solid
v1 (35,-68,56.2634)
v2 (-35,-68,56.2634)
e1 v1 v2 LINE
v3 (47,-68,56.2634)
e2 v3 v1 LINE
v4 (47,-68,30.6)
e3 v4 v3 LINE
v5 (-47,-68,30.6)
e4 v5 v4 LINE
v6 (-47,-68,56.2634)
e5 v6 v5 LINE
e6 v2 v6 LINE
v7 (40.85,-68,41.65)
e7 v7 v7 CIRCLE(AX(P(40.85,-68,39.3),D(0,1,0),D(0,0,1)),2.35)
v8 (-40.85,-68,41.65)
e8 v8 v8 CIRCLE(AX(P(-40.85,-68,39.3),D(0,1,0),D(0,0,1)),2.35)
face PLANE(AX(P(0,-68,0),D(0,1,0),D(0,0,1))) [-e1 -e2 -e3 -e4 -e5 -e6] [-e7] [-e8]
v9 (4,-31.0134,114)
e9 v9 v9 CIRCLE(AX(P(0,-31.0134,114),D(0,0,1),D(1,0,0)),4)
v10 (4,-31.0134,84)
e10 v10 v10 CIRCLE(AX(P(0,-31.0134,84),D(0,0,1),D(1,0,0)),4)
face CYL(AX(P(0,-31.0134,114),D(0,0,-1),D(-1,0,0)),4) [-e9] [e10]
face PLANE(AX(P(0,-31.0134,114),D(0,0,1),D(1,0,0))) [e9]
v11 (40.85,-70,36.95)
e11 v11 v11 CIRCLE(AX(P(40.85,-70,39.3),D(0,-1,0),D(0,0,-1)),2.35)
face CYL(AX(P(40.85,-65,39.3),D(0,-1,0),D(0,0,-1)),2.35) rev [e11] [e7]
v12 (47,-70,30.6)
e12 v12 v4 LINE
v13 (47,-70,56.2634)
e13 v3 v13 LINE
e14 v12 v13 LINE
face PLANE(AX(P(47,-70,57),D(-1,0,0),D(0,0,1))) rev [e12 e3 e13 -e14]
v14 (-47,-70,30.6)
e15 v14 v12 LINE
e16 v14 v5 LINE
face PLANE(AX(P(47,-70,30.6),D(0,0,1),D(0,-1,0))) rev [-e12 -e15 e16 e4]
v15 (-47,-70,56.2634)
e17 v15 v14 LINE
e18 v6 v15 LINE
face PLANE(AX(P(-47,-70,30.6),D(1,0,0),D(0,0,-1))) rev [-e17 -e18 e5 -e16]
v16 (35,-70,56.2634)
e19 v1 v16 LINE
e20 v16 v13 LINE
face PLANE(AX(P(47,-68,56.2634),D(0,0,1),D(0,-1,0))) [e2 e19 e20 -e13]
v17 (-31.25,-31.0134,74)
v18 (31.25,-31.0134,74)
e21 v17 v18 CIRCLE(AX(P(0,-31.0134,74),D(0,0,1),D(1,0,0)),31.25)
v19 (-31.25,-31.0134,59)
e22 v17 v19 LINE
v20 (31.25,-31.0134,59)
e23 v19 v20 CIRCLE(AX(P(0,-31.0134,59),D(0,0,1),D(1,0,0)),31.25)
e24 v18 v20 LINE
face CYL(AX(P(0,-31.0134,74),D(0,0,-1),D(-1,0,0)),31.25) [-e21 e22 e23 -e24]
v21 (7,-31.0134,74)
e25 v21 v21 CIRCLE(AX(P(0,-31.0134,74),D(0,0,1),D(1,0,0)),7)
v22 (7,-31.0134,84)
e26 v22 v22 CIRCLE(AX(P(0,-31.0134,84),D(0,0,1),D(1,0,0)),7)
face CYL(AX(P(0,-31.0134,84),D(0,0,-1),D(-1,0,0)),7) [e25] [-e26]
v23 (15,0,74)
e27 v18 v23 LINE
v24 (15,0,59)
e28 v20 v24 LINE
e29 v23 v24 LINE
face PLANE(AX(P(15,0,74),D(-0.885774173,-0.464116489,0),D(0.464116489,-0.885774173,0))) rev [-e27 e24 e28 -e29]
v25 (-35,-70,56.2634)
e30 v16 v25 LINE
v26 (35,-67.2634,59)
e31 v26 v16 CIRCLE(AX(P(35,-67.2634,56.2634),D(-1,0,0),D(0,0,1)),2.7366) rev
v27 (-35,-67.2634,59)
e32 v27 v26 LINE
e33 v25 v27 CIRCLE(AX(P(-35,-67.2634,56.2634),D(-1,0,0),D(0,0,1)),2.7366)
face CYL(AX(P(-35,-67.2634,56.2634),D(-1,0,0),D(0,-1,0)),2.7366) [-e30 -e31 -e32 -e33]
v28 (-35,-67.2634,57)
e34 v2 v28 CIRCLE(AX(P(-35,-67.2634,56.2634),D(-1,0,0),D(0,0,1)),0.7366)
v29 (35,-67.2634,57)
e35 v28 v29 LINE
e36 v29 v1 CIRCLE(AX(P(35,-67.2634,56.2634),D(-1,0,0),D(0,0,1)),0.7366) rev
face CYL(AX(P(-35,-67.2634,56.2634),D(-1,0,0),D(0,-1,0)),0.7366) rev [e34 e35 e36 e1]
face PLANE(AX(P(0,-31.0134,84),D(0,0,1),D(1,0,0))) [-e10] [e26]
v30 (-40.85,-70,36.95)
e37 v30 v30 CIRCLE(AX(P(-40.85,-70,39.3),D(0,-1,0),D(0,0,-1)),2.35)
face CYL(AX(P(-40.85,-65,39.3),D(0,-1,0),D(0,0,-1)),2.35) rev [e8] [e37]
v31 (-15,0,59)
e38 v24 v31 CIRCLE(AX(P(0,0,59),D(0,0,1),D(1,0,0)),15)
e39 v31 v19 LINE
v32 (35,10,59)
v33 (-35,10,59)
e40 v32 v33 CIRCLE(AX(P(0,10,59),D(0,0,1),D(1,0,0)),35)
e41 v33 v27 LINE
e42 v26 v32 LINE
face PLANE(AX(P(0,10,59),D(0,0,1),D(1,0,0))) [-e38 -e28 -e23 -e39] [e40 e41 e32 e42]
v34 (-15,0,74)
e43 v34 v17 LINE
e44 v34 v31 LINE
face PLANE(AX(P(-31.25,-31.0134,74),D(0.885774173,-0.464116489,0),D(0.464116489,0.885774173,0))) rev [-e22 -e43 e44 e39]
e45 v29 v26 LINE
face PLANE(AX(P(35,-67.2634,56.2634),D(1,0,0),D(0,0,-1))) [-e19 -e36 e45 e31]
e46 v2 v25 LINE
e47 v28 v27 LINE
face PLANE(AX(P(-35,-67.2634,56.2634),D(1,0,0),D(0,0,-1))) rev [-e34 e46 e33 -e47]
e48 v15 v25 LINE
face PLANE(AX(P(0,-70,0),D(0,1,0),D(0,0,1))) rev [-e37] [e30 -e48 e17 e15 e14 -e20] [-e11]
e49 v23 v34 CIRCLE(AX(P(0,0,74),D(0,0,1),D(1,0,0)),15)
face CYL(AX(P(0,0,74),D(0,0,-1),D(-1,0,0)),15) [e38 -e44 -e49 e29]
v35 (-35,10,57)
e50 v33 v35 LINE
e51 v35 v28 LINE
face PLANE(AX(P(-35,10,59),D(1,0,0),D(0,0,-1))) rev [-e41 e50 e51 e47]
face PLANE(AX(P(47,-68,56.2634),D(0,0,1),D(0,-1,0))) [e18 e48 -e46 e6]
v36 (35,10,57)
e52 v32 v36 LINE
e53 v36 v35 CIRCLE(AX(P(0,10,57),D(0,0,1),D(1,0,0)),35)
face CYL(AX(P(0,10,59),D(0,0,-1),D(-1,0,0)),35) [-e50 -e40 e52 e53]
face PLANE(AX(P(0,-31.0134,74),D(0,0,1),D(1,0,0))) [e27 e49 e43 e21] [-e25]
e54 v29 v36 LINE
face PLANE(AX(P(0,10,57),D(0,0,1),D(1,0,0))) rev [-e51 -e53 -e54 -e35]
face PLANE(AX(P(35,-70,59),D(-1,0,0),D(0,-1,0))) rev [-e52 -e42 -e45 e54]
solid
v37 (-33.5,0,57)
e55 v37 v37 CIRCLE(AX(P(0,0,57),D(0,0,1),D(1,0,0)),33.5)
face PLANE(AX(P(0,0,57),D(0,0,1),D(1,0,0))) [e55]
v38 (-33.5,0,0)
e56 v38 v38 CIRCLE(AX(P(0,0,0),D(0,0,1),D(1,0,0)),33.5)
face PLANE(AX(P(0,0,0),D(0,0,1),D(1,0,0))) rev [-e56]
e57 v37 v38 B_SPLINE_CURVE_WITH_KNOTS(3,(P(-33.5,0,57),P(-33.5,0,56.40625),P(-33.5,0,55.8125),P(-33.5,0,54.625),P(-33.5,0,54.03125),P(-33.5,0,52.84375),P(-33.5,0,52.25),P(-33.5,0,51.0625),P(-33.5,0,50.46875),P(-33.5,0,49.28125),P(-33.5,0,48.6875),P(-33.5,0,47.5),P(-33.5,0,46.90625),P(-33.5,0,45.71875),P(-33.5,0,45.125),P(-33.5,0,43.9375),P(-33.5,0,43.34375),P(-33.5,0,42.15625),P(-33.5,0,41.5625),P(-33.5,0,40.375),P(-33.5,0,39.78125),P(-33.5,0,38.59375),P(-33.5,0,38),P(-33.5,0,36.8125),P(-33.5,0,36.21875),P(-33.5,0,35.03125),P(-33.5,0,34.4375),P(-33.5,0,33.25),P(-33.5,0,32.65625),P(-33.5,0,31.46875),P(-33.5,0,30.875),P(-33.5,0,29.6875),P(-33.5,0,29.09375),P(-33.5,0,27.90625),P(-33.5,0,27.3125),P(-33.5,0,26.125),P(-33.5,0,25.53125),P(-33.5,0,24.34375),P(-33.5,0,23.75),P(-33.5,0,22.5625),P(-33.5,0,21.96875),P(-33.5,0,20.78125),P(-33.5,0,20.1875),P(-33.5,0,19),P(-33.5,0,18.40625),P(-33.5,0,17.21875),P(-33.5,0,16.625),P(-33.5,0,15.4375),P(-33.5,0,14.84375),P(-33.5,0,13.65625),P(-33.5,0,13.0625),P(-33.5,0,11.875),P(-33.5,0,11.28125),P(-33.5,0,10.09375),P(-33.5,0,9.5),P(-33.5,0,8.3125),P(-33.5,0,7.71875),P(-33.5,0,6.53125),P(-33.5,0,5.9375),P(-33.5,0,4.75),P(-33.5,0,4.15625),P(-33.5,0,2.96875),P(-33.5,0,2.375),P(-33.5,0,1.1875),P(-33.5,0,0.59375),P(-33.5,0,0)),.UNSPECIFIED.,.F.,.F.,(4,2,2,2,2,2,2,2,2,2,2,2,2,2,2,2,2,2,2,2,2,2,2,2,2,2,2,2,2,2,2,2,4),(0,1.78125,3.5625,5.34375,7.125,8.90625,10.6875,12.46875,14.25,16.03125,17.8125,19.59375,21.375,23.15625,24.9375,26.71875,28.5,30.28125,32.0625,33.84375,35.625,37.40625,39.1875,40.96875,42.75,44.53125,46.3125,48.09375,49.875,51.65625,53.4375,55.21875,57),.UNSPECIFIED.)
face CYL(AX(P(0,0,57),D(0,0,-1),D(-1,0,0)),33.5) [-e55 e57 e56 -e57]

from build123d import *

# Parameters (mm, degrees)
SKETCH1_R                    = 33.5
BOSS_EXTRUDE1_DEPTH          = 57
BASE_FLANGE1_DEPTH           = 2
EDGE_FLANGE4_STRIP_W         = 9.4732
EDGE_FLANGE4_STRIP_H         = 2
EDGE_FLANGE4_STRIP_CUT_DEPTH = 70
EDGE_FLANGE4_DEPTH           = 70
EDGE_FLANGE4_PROFILE_W       = 94
EDGE_FLANGE4_PROFILE_H       = 25.6634
EDGE_FLANGE4_FLAT_DEPTH      = 2
BOSS_EXTRUDE5_DEPTH          = 15
SKETCH23_R                   = 7
BOSS_EXTRUDE6_DEPTH          = 10
SKETCH24_R                   = 4
BOSS_EXTRUDE7_DEPTH          = 30
SKETCH25_R                   = 2.35
CUT_EXTRUDE1_DEPTH           = 5


# Sheet-metal steps are written as plain solids
with BuildPart() as part:
    # Sketch1 → Boss-Extrude1 (new body)
    with BuildSketch(Plane.XY):
        with Locations(Location((0, 0, 0), (0, 0, 180))):
            Circle(SKETCH1_R)
    extrude(amount=BOSS_EXTRUDE1_DEPTH)


with BuildPart() as body_2:
    # Sketch2 → Base-Flange1 (new body)
    with BuildSketch(Plane.XY.offset(57)):
        with BuildLine():
            Line((-35, 10), (-35, -70))
            Line((-35, -70), (35, -70))
            Line((35, -70), (35, 10))
            ThreePointArc((35, 10), (0, 45), (-35, 10))
        make_face()
    extrude(amount=BASE_FLANGE1_DEPTH)

    # Edge-Flange4 strip (across the edge) → Edge-Flange4 strip cut (cut)
    with BuildSketch(Plane(origin=(35, -70, 57), x_dir=(0, 1, 0), z_dir=(-1, 0, 0))):
        with Locations((-2, -1)):
            Rectangle(EDGE_FLANGE4_STRIP_W, EDGE_FLANGE4_STRIP_H)
    extrude(amount=EDGE_FLANGE4_STRIP_CUT_DEPTH, mode=Mode.SUBTRACT)

    # Edge-Flange4 bend section (across the edge) → Edge-Flange4 (add)
    with BuildSketch(Plane(origin=(35, -70, 57), x_dir=(0, 1, 0), z_dir=(-1, 0, 0))):
        with BuildLine():
            Line((0, 0.7366), (2, 0.7366))
            ThreePointArc((2, 0.7366), (2.215745145, 0.215745145), (2.7366, 0))
            Line((2.7366, 0), (2.7366, -2))
            ThreePointArc((2.7366, -2), (0.801531583, -1.198468417), (0, 0.7366))
        make_face()
    extrude(amount=EDGE_FLANGE4_DEPTH)

    # Edge-Flange4 profile (on flange) → Edge-Flange4 flat (add)
    with BuildSketch(Plane(origin=(0, -70, 57), x_dir=(-1, 0, 0), z_dir=(0, -1, 0))):
        with Locations((0, 13.5683)):
            Rectangle(EDGE_FLANGE4_PROFILE_W, EDGE_FLANGE4_PROFILE_H)
    extrude(amount=-EDGE_FLANGE4_FLAT_DEPTH)

    # Sketch12 → Boss-Extrude5 (add)
    with BuildSketch(Plane.XY.offset(59)):
        with BuildLine():
            Line((-31.25, -31.0134), (-15, 0))
            ThreePointArc((-15, 0), (0, 15), (15, 0))
            Line((15, 0), (31.25, -31.0134))
            ThreePointArc((31.25, -31.0134), (0, -62.2634), (-31.25, -31.0134))
        make_face()
    extrude(amount=BOSS_EXTRUDE5_DEPTH)

    # Sketch23 → Boss-Extrude6 (add)
    with BuildSketch(Plane.XY.offset(74)):
        with Locations((0, -31.0134)):
            Circle(SKETCH23_R)
    extrude(amount=BOSS_EXTRUDE6_DEPTH)

    # Sketch24 → Boss-Extrude7 (add)
    with BuildSketch(Plane.XY.offset(84)):
        with Locations((0, -31.0134)):
            Circle(SKETCH24_R)
    extrude(amount=BOSS_EXTRUDE7_DEPTH)

    # Sketch25 → Cut-Extrude1 (cut)
    with BuildSketch(Plane.XZ.offset(70)):
        with Locations(Location((40.85, 39.3, 0), (0, 0, 270))):
            Circle(SKETCH25_R)
        with Locations(Location((-40.85, 39.3, 0), (0, 0, 270))):
            Circle(SKETCH25_R)
    extrude(amount=-CUT_EXTRUDE1_DEPTH, mode=Mode.SUBTRACT)


solid = Compound([part.part, body_2.part])
